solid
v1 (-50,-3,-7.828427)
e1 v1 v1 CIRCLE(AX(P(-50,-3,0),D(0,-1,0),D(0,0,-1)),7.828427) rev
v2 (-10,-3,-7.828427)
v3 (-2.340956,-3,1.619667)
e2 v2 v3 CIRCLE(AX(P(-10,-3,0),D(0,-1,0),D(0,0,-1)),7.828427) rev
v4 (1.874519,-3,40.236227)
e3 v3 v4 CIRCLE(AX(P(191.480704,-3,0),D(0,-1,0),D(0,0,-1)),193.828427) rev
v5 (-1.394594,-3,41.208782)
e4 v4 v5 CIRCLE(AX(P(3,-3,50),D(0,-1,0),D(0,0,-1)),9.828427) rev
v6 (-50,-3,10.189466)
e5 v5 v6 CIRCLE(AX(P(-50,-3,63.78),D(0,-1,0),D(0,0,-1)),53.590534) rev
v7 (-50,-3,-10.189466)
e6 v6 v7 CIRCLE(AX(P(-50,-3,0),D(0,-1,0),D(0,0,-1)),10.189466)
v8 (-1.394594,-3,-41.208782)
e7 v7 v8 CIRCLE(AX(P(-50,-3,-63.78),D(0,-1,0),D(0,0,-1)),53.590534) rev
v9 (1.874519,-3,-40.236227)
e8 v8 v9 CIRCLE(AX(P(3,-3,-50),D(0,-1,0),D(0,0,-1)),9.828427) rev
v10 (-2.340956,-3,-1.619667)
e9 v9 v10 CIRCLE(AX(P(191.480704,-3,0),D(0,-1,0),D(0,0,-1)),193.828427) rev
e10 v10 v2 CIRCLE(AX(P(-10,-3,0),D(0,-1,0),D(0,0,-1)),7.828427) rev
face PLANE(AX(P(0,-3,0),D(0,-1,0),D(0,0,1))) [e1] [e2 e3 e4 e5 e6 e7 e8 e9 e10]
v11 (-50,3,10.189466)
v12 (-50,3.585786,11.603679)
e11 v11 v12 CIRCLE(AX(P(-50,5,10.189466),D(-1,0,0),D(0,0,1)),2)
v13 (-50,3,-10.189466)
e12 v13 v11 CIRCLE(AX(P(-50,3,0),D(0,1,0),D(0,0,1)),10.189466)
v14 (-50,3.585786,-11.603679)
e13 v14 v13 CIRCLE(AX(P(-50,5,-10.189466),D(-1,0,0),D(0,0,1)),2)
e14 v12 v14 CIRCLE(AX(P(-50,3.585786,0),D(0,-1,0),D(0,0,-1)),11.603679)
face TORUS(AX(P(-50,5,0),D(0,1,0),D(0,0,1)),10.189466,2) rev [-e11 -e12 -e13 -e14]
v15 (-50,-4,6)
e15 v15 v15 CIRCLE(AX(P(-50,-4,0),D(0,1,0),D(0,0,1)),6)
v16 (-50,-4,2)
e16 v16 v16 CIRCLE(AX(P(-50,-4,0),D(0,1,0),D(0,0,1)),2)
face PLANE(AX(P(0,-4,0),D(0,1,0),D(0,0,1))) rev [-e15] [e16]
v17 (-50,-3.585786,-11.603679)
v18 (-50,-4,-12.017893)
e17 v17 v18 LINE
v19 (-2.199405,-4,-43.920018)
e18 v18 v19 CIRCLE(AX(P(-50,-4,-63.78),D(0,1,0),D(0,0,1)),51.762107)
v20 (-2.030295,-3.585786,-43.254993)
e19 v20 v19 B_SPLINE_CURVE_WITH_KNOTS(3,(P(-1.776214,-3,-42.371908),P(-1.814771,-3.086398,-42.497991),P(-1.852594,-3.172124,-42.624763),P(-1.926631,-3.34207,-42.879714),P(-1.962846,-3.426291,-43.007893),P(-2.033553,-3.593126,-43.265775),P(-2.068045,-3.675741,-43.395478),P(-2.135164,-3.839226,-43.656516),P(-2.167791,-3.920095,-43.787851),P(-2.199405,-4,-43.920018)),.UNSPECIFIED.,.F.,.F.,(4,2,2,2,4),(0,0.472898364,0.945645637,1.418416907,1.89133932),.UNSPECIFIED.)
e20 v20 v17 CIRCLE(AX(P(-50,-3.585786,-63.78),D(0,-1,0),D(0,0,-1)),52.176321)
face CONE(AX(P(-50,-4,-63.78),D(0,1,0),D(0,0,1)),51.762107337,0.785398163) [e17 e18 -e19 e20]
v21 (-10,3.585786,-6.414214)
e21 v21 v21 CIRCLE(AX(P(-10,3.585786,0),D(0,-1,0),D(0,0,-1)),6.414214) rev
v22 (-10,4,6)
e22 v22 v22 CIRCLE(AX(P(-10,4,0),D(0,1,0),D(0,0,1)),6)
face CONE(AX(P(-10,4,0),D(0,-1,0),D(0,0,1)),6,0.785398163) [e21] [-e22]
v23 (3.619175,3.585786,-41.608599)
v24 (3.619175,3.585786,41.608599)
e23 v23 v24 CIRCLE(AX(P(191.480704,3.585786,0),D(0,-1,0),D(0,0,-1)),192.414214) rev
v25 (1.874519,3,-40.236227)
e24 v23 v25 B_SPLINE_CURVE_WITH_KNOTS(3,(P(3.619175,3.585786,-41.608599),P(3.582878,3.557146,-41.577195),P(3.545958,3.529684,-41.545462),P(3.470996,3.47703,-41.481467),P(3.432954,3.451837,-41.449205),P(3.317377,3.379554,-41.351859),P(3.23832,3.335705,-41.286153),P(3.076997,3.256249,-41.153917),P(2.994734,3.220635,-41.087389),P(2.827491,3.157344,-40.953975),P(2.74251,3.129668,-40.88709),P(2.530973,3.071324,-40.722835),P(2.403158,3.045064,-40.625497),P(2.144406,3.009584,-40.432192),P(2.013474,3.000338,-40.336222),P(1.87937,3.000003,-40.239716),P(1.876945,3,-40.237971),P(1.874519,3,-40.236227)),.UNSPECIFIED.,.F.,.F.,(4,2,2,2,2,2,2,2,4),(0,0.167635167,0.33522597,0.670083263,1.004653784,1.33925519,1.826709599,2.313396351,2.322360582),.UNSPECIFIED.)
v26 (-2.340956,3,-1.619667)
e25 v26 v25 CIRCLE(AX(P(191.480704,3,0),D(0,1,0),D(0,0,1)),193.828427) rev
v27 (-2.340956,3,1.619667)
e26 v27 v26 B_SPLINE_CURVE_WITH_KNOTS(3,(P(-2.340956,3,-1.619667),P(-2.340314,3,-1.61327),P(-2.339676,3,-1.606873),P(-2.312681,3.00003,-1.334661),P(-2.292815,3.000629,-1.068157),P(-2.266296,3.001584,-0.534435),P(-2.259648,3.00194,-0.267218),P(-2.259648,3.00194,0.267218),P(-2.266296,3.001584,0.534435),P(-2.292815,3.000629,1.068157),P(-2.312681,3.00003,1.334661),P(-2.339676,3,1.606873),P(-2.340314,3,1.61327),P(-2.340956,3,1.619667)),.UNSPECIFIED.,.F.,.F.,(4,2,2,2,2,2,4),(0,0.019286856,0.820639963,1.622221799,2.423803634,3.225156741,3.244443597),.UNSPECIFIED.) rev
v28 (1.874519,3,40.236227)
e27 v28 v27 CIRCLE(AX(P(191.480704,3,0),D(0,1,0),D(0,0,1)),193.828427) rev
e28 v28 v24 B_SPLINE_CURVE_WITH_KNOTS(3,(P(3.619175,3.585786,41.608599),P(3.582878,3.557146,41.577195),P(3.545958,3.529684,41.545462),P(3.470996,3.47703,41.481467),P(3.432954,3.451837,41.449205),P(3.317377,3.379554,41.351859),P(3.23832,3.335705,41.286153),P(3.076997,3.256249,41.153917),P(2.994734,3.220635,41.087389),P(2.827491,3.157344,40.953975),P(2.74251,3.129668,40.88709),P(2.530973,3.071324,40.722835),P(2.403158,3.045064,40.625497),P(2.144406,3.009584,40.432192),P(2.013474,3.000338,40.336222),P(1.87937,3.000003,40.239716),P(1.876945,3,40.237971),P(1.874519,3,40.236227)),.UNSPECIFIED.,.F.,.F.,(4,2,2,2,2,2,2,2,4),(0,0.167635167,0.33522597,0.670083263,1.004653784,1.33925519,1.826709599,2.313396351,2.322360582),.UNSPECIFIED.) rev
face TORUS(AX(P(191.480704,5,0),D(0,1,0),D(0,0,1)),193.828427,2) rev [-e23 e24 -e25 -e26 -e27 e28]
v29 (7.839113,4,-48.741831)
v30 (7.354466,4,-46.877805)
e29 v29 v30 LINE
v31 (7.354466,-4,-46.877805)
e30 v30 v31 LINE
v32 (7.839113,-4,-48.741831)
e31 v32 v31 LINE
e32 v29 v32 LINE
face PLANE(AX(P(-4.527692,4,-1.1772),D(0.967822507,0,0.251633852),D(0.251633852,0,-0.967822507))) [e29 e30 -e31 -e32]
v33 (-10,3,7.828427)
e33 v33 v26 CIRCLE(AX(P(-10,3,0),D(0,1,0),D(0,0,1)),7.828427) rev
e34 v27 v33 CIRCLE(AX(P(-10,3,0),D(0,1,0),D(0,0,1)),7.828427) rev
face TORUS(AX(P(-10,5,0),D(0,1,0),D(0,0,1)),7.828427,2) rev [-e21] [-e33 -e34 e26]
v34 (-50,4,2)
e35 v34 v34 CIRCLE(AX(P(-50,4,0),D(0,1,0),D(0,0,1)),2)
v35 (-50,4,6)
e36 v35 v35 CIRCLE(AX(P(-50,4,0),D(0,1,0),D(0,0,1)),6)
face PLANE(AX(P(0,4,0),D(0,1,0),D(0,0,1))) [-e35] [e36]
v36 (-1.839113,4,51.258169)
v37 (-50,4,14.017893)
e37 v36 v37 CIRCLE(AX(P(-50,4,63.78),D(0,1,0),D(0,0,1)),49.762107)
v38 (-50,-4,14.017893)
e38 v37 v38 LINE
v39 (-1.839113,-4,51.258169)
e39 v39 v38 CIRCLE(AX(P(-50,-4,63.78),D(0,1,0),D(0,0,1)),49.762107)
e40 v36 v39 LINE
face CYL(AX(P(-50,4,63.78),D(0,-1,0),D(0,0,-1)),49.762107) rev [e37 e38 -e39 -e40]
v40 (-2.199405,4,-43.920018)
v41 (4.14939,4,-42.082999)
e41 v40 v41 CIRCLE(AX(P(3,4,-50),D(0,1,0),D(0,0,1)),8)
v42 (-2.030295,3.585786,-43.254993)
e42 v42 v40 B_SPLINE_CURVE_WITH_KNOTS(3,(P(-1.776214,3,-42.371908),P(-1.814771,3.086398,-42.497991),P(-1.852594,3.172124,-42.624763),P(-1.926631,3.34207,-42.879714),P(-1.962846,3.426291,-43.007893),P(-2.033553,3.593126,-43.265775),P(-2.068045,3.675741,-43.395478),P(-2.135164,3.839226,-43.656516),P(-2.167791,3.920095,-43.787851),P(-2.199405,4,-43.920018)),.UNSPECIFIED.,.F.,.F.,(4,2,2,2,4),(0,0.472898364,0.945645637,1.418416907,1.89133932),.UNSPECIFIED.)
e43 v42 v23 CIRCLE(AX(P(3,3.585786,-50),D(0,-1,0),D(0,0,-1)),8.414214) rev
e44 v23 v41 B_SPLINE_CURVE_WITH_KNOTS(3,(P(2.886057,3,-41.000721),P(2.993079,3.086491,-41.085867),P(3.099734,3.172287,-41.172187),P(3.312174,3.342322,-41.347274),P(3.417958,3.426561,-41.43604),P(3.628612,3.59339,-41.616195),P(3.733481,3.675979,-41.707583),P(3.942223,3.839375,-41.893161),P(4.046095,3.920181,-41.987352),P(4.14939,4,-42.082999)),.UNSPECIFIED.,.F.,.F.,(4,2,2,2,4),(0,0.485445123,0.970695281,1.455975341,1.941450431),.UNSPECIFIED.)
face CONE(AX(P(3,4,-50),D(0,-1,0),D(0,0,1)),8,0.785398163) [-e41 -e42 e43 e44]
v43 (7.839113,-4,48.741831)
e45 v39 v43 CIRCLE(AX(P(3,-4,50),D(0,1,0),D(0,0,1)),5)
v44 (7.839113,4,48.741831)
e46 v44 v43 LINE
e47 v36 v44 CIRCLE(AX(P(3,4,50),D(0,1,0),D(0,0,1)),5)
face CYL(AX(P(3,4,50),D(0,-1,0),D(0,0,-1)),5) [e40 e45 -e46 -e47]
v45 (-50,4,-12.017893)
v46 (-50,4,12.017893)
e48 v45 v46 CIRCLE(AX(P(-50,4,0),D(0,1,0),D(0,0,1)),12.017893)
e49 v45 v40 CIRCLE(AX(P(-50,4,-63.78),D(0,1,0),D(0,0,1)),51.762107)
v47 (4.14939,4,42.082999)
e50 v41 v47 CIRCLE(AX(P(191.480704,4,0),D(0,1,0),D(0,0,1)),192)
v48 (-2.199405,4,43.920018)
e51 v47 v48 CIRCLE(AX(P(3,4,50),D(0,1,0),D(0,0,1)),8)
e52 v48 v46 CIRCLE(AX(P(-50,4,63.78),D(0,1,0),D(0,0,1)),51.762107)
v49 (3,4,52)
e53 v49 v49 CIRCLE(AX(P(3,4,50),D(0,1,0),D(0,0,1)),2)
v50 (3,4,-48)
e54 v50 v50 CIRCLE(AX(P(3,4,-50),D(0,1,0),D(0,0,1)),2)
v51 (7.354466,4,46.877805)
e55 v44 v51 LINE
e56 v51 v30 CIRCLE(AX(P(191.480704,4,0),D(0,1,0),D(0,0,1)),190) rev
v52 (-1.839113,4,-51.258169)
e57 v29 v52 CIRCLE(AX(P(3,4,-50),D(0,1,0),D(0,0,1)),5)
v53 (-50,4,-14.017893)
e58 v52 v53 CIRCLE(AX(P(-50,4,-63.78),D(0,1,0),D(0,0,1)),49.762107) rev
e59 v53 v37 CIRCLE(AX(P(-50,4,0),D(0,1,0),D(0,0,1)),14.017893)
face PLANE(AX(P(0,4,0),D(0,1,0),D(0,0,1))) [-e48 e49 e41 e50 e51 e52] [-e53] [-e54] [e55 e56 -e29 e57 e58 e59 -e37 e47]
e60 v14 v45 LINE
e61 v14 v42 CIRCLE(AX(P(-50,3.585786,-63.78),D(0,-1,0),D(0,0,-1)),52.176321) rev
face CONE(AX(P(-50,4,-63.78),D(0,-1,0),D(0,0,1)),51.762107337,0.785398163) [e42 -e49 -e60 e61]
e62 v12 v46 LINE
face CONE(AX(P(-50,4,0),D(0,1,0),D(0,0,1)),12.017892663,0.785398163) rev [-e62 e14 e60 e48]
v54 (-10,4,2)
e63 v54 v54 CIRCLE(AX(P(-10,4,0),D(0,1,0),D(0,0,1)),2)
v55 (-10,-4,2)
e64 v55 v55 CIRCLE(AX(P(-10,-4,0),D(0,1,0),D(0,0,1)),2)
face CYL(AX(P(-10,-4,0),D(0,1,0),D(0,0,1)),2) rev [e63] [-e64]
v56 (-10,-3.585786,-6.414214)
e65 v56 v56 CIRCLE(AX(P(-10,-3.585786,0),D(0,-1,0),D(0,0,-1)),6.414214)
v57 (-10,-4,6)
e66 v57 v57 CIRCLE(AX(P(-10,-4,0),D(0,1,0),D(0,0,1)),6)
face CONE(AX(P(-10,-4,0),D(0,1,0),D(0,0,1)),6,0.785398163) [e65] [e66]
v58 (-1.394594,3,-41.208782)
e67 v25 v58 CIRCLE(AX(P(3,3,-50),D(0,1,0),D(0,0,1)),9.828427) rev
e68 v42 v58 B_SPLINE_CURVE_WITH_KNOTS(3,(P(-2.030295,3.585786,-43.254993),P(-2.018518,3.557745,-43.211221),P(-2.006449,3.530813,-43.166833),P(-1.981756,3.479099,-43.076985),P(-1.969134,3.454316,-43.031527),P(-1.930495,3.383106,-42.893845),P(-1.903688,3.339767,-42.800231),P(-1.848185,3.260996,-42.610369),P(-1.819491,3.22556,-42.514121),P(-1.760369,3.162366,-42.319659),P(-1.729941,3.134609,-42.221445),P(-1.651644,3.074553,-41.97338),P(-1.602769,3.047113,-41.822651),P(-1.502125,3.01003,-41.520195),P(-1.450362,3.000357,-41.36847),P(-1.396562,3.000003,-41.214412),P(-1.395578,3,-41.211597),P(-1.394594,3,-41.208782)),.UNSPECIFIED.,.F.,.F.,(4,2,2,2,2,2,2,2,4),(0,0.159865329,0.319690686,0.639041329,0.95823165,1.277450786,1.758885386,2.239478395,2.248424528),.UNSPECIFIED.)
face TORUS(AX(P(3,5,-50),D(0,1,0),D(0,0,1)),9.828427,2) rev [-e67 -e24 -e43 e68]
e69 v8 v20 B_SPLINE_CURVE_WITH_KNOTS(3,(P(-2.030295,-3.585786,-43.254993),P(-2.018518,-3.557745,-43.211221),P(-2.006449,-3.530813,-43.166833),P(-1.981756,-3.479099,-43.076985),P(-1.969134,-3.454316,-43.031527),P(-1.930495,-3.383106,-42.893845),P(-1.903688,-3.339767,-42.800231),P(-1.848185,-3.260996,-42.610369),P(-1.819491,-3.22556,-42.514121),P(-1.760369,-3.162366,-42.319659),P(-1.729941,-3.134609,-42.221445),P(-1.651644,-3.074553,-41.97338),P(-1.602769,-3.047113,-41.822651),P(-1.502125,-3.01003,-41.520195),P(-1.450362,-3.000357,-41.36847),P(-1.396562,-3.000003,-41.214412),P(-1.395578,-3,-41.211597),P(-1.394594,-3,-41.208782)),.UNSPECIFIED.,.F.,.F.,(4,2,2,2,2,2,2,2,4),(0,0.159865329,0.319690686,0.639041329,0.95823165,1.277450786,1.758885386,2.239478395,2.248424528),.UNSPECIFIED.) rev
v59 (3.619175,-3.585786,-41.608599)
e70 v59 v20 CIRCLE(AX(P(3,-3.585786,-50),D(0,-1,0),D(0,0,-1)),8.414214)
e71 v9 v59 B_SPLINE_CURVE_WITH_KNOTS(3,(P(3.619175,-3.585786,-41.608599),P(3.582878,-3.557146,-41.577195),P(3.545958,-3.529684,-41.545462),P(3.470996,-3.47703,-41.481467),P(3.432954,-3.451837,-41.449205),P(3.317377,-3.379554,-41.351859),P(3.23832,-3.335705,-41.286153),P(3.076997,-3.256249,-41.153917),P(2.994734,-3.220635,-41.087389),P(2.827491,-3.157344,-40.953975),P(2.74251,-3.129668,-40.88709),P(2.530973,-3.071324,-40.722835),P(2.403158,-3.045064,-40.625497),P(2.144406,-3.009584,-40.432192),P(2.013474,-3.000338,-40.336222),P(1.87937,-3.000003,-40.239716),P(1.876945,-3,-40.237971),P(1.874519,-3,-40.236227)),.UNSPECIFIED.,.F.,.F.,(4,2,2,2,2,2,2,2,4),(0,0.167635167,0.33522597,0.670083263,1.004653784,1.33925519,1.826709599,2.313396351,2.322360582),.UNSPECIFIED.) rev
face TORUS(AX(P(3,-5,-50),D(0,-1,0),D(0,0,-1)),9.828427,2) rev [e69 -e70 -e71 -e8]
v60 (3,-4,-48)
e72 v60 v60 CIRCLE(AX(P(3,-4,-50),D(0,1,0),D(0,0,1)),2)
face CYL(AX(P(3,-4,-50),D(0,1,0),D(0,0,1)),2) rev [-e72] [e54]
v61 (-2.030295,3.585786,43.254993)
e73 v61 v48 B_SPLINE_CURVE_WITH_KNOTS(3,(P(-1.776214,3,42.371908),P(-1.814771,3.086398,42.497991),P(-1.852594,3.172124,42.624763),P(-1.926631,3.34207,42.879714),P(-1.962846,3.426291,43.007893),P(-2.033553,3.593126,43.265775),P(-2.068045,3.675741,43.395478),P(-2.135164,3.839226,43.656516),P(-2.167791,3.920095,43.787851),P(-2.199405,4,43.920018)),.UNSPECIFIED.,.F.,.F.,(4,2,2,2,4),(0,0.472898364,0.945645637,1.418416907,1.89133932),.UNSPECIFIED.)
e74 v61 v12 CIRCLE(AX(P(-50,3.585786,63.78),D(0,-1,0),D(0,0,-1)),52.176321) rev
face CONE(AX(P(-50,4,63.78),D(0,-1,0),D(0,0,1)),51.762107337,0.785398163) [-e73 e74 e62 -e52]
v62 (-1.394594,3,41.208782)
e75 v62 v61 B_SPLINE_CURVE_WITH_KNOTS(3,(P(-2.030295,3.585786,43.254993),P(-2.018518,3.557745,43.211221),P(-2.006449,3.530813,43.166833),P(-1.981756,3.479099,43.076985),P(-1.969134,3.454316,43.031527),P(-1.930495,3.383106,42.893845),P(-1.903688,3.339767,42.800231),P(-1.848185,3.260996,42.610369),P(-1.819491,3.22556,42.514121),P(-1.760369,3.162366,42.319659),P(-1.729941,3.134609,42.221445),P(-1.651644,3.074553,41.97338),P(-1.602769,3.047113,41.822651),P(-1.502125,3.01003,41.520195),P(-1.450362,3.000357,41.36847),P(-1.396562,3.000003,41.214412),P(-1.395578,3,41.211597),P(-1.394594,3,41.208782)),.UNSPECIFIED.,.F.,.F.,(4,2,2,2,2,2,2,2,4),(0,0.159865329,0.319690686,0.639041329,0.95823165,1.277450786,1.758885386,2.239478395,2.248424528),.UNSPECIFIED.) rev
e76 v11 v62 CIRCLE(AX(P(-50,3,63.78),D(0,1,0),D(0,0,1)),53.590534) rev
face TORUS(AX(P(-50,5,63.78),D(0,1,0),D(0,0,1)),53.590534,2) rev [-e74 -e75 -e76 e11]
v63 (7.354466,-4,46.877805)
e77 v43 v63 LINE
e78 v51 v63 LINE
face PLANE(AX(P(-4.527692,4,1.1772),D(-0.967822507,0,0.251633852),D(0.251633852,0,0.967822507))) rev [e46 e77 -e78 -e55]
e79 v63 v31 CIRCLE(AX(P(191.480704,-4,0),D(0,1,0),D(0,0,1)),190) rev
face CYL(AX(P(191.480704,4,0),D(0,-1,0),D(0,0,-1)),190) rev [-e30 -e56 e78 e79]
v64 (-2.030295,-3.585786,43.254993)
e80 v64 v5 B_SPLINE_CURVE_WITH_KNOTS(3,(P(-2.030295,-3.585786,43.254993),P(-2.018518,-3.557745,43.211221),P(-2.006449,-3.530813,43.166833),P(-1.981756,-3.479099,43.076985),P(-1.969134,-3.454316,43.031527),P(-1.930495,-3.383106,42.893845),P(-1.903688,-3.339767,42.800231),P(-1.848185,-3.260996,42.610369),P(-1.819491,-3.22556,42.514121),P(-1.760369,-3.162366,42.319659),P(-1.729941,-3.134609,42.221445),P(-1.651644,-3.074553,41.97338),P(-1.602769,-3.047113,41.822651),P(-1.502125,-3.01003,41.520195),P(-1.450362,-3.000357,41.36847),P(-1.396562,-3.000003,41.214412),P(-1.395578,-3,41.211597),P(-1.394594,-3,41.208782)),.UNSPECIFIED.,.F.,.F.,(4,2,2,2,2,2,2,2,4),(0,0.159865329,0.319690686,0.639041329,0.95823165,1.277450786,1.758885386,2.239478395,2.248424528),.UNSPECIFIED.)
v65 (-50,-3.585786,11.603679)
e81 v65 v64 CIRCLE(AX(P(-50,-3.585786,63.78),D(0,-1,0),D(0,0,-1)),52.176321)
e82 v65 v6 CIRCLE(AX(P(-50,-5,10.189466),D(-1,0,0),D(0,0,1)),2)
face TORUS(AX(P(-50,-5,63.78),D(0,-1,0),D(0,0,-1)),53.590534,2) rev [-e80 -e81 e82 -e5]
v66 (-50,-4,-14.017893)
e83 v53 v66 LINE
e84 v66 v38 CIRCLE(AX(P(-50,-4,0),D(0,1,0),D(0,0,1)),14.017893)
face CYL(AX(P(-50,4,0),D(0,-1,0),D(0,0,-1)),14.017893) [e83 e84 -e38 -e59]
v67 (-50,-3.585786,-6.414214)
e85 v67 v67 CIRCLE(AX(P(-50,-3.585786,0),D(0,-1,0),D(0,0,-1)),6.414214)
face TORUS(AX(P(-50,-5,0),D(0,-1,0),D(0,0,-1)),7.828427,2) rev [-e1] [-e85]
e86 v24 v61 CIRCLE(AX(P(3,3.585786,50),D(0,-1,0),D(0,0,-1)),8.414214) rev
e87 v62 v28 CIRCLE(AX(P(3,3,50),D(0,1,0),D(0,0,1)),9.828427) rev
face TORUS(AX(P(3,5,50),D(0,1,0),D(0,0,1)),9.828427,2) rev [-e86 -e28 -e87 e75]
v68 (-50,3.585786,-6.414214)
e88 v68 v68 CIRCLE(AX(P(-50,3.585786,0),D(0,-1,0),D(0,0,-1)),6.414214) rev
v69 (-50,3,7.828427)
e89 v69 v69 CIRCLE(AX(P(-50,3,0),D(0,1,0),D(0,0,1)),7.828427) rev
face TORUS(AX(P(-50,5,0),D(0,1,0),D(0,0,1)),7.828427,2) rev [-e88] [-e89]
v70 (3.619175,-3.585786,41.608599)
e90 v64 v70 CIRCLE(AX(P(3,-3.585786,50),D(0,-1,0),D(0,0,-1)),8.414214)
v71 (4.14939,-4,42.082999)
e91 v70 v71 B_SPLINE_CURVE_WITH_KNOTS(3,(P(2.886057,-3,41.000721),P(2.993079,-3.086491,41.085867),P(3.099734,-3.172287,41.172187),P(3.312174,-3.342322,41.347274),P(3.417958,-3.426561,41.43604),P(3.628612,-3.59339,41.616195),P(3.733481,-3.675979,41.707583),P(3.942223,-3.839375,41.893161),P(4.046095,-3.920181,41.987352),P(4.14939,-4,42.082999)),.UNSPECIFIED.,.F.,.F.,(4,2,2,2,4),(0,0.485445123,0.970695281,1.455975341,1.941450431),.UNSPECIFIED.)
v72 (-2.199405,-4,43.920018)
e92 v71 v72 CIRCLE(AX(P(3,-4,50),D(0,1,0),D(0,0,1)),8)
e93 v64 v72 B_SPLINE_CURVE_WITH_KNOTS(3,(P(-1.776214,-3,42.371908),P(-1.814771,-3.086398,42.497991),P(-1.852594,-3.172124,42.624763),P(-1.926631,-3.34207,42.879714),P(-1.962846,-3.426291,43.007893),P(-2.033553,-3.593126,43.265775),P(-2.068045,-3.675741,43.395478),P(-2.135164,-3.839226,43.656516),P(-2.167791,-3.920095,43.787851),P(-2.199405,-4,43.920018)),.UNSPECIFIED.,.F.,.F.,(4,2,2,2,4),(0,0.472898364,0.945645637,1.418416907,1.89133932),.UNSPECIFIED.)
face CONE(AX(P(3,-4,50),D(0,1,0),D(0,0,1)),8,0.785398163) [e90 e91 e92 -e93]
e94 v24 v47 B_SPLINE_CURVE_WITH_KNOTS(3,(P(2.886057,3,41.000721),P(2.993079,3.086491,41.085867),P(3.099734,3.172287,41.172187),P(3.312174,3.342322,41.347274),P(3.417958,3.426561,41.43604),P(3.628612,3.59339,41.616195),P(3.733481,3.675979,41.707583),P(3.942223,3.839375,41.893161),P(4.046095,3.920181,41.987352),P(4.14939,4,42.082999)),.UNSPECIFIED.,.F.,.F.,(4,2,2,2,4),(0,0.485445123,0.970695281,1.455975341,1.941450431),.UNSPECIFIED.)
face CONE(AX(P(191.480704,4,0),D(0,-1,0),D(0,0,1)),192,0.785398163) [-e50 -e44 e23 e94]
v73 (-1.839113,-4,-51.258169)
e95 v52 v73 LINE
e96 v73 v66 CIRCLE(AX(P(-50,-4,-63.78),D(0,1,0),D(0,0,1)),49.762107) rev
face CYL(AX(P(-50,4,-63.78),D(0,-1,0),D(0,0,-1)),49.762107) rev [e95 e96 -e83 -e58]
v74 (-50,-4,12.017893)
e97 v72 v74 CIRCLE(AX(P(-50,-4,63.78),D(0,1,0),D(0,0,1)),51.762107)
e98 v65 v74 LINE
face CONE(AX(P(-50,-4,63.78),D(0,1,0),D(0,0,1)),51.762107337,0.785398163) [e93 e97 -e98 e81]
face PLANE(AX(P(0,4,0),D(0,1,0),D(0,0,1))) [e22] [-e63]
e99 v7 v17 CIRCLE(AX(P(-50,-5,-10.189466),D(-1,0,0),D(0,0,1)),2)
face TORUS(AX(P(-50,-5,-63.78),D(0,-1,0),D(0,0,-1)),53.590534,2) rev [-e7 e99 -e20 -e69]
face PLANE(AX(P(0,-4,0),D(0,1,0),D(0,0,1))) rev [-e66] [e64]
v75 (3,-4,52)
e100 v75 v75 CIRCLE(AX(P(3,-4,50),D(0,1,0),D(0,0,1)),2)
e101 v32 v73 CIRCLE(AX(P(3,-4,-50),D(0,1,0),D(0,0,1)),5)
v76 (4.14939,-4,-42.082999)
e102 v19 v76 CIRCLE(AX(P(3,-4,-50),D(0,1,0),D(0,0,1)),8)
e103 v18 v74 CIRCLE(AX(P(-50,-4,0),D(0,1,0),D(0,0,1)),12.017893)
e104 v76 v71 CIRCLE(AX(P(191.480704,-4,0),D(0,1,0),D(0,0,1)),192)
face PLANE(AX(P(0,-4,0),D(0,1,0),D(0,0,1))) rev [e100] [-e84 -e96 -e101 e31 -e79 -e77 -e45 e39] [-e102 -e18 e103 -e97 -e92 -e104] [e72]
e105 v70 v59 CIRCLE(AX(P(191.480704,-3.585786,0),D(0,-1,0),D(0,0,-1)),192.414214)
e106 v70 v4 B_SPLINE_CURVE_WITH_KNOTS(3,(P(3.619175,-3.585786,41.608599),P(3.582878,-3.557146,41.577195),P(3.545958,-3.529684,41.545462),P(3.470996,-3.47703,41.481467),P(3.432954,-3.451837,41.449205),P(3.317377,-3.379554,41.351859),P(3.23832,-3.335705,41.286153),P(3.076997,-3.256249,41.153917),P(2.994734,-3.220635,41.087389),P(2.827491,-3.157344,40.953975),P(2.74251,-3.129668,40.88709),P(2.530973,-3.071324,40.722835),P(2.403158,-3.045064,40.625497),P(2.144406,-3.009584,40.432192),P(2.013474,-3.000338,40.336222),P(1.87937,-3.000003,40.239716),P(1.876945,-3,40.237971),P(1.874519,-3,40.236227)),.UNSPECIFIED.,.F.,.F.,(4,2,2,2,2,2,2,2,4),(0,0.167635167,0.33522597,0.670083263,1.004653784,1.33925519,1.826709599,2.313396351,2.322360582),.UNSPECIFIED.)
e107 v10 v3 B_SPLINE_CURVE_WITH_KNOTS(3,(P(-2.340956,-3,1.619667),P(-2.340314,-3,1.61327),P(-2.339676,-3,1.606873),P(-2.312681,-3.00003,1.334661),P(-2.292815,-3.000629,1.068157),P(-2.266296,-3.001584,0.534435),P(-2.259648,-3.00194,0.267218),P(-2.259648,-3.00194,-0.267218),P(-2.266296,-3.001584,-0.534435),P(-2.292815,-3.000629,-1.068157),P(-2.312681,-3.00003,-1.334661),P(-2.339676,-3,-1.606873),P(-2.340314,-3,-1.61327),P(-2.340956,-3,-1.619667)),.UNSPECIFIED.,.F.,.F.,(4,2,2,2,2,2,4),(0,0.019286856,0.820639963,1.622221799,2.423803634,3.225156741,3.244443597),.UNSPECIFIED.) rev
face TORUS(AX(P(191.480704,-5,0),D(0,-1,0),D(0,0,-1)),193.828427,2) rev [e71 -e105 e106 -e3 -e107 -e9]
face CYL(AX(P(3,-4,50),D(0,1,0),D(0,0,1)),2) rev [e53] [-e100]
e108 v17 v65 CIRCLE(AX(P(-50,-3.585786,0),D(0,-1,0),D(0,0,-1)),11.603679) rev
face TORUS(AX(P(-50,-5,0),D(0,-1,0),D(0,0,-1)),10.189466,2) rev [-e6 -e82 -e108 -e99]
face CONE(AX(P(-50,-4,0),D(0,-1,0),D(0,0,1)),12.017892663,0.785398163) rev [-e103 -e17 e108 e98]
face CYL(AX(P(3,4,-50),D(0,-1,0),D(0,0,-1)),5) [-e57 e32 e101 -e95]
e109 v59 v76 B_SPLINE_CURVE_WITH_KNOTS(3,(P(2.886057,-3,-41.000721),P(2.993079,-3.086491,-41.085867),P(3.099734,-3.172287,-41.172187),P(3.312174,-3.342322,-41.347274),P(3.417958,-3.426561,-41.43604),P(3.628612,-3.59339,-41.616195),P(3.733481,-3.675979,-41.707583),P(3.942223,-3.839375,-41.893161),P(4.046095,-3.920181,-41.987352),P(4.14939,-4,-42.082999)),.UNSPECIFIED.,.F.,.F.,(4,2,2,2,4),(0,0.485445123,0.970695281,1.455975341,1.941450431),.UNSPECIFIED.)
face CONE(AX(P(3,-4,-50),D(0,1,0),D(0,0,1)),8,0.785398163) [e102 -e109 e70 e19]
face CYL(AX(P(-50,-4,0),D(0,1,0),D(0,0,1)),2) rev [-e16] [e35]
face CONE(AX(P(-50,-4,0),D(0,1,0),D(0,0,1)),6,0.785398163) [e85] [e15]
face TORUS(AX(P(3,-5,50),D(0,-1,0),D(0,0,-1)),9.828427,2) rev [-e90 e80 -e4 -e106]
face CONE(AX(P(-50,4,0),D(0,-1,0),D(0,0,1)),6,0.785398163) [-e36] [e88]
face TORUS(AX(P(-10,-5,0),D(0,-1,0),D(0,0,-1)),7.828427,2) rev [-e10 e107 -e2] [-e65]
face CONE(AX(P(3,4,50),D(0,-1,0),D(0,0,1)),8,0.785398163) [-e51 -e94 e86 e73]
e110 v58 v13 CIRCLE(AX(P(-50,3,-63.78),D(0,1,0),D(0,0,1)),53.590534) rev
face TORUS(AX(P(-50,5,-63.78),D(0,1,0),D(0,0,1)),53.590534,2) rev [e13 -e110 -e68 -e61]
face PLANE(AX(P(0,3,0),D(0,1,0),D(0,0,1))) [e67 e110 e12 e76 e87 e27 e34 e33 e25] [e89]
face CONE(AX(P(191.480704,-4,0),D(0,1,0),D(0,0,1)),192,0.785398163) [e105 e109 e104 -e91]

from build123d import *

# Parameters (mm, degrees)
BOSS_EXTRUDE1_DEPTH     = 4
SKETCH2_R               = 2
CUT_EXTRUDE1_DEPTH      = 58.567351858
SKETCH4_R               = 2
CUT_EXTRUDE2_DEPTH      = 58.567351858
BOSS_EXTRUDE2_DEPTH     = 4
SKETCH7_R               = 2
CUT_EXTRUDE3_DEPTH      = 85.777889694
BOSS_EXTRUDE3_DEPTH     = 4
SKETCH9_R               = 6
CUT_EXTRUDE4_DEPTH      = 1
CUT_EXTRUDE4_DRAFT      = -45
FILLET5_R               = 2
MIRROR2_COPY_1_SKETCH_R = 6
MIRROR2_COPY_1_DEPTH    = 1
MIRROR2_COPY_1_DRAFT    = -45
FILLET5_OF_MIRROR2_R    = 2


with BuildPart() as part:
    # Sketch1 → Boss-Extrude1 (new, symmetric)
    with BuildSketch(Plane(origin=(0, 0, 0), x_dir=(1, 0, 0), z_dir=(0, 1, 0))):
        with BuildLine():
            Line((-14.839112534, -1.258169259), (-1.839112534, -51.258169259))
            ThreePointArc((-1.839112534, -51.258169259), (4.258169259, -54.839112534), (7.839112534, -48.741830741))
            Line((7.839112534, -48.741830741), (-4.833763459, 0))
            Line((-4.833763459, 0), (-5.160887466, -1.258169259))
            ThreePointArc((-5.160887466, -1.258169259), (-10, -5), (-14.839112534, -1.258169259))
        make_face()
        with BuildLine():
            ThreePointArc((-14.839112534, 1.258169259), (-15, 0), (-14.839112534, -1.258169259))
            ThreePointArc((-14.839112534, -1.258169259), (-10, -5), (-5.160887466, -1.258169259))
            Line((-5.160887466, -1.258169259), (-4.833763459, 0))
            Line((-4.833763459, 0), (-5.160887466, 1.258169259))
            ThreePointArc((-5.160887466, 1.258169259), (-10, 5), (-14.839112534, 1.258169259))
        make_face()
        with BuildLine():
            Line((-1.839112534, 51.258169259), (-14.839112534, 1.258169259))
            ThreePointArc((-14.839112534, 1.258169259), (-10, 5), (-5.160887466, 1.258169259))
            Line((-5.160887466, 1.258169259), (-4.833763459, 0))
            Line((-4.833763459, 0), (7.839112534, 48.741830741))
            ThreePointArc((7.839112534, 48.741830741), (4.258169259, 54.839112534), (-1.839112534, 51.258169259))
        make_face()
    extrude(amount=BOSS_EXTRUDE1_DEPTH, both=True)

    # Sketch2 → Cut-Extrude1 (cut, through all)
    with BuildSketch(Plane(origin=(0, 4, 0), x_dir=(1, 0, 0), z_dir=(0, 1, 0))):
        with Locations(Location((-10, 0, 0), (0, 0, 270))):
            Circle(SKETCH2_R)
    extrude(amount=-CUT_EXTRUDE1_DEPTH, mode=Mode.SUBTRACT)

    # Sketch4 → Cut-Extrude2 (cut, through all)
    with BuildSketch(Plane(origin=(0, 4, 0), x_dir=(1, 0, 0), z_dir=(0, 1, 0))):
        with Locations(Location((3, -50, 0), (0, 0, 270))):
            Circle(SKETCH4_R)
        with Locations(Location((3, 50, 0), (0, 0, 270))):
            Circle(SKETCH4_R)
    extrude(amount=-CUT_EXTRUDE2_DEPTH, mode=Mode.SUBTRACT)

    # Sketch6 → Boss-Extrude2 (add, symmetric)
    with BuildSketch(Plane(origin=(0, 0, 0), x_dir=(1, 0, 0), z_dir=(0, 1, 0))):
        with BuildLine():
            Line((-1.839112534, -51.258169259), (-14.839112534, -1.258169259))
            ThreePointArc((-14.839112534, -1.258169259), (-15, 0), (-14.839112534, 1.258169259))
            Line((-14.839112534, 1.258169259), (-1.839112534, 51.258169259))
            ThreePointArc((-1.839112534, 51.258169259), (-19.560267402, 24.413897754), (-50, 14.017892663))
            ThreePointArc((-50, 14.017892663), (-64.017892663, 0), (-50, -14.017892663))
            ThreePointArc((-50, -14.017892663), (-19.560267402, -24.413897754), (-1.839112534, -51.258169259))
        make_face()
    extrude(amount=BOSS_EXTRUDE2_DEPTH, both=True)

    # Sketch7 → Cut-Extrude3 (cut, through all)
    with BuildSketch(Plane(origin=(0, 4, 0), x_dir=(1, 0, 0), z_dir=(0, 1, 0))):
        with Locations(Location((-50, 0, 0), (0, 0, 270))):
            Circle(SKETCH7_R)
    extrude(amount=-CUT_EXTRUDE3_DEPTH, mode=Mode.SUBTRACT)

    # Sketch8 → Boss-Extrude3 (add, symmetric)
    with BuildSketch(Plane(origin=(0, 0, 0), x_dir=(1, 0, 0), z_dir=(0, 1, 0))):
        with BuildLine():
            ThreePointArc((7.35446577, -46.877804725), (1.480703509, 0), (7.35446577, 46.877804725))
            Line((7.35446577, 46.877804725), (-4.833763459, 0))
            Line((-4.833763459, 0), (7.35446577, -46.877804725))
        make_face()
    extrude(amount=BOSS_EXTRUDE3_DEPTH, both=True)


with BuildPart() as cut_extrude4_tool:
    # Sketch9 → Cut-Extrude4 (with draft: the straight prism first)
    with BuildSketch(Plane(origin=(0, 4, 0), x_dir=(1, 0, 0), z_dir=(0, 1, 0))):
        with BuildLine():
            ThreePointArc((-2.199405253, -43.920017679), (0.776418175, -42.315230396), (4.149389552, -42.082999074))
            ThreePointArc((4.149389552, -42.082999074), (-0.519296491, 0), (4.149389552, 42.082999074))
            ThreePointArc((4.149389552, 42.082999074), (0.776418175, 42.315230396), (-2.199405253, 43.920017679))
            ThreePointArc((-2.199405253, 43.920017679), (-21.26568933, 20.725904419), (-50, 12.017892663))
            ThreePointArc((-50, 12.017892663), (-62.017892663, 0), (-50, -12.017892663))
            ThreePointArc((-50, -12.017892663), (-21.26568933, -20.725904419), (-2.199405253, -43.920017679))
        make_face()
        with Locations((-10, 0)):
            Circle(SKETCH9_R, mode=Mode.SUBTRACT)
        with Locations((-50, 0)):
            Circle(SKETCH9_R, mode=Mode.SUBTRACT)
    extrude(amount=-CUT_EXTRUDE4_DEPTH)
    # Cut-Extrude4: the draft: its side faces are tilted about the plane it starts from
    cut_extrude4_sides = [cut_extrude4_tool.faces().sort_by_distance(p)[0] for p in [
        (0.776418175, 3.5, 42.315230396),
        (-0.519296491, 3.5, 0),
        (0.776418175, 3.5, -42.315230396),
        (-21.26568933, 3.5, -20.725904419),
        (-62.017892663, 3.5, 0),
        (-21.26568933, 3.5, 20.725904419),
        (-16, 3.5, 0),
        (-56, 3.5, 0),
    ]]
    draft(cut_extrude4_sides, Plane(origin=(0, 4, 0), x_dir=(1, 0, 0), z_dir=(0, 1, 0)), CUT_EXTRUDE4_DRAFT)


with BuildPart() as part_1:
    add(part.part)

    # Cut-Extrude4: cut by cut_extrude4_tool
    add(cut_extrude4_tool.part, mode=Mode.SUBTRACT)

    # Fillet5
    # the kernel refuses this fillet: 2 mm, written as the material it adds along each edge
    with BuildSketch(Plane(origin=(-50, 3, 0), x_dir=(1, 0, 0), z_dir=(0, 0, 1))) as fillet5_piece_1:
        with BuildLine():
            CenterArc((7 + FILLET5_R * 0.414213562373, FILLET5_R), FILLET5_R, 225, 45)
            Line((7 - FILLET5_R * 0.292893218813, FILLET5_R * 0.292893218813), (7, 0))
            Line((7, 0), (7 + FILLET5_R * 0.414213562373, 0))
        make_face()
    fillet5_piece_1_solid = revolve(axis=Axis((-50, 3, 0), (0, 1, 0)), mode=Mode.PRIVATE)
    with BuildSketch(Plane(origin=(-10, 3, 0), x_dir=(1, 0, 0), z_dir=(0, 0, 1))) as fillet5_piece_2:
        with BuildLine():
            CenterArc((7 + FILLET5_R * 0.414213562373, FILLET5_R), FILLET5_R, 225, 45)
            Line((7 - FILLET5_R * 0.292893218813, FILLET5_R * 0.292893218813), (7, 0))
            Line((7, 0), (7 + FILLET5_R * 0.414213562373, 0))
        make_face()
    fillet5_piece_2_solid = revolve(axis=Axis((-10, 3, 0), (0, 1, 0)), mode=Mode.PRIVATE)
    with BuildSketch(Plane(origin=(-50, 3, 0), x_dir=(0, 0, -1), z_dir=(1, 0, 0))) as fillet5_piece_3:
        with BuildLine():
            CenterArc((11.017892663 - FILLET5_R * 0.414213562373, FILLET5_R), FILLET5_R, 270, 45)
            Line((11.017892663 - FILLET5_R * 0.414213562373, 0), (11.017892663, 0))
            Line((11.017892663, 0), (11.017892663 + FILLET5_R * 0.292893218813, FILLET5_R * 0.292893218813))
        make_face()
    fillet5_piece_3_solid = revolve(axis=Axis((-50, 3, 0), (0, 1, 0)), revolution_arc=180, mode=Mode.PRIVATE)
    with BuildSketch(Plane(origin=(-50, 3, -63.78), x_dir=(0.9292070128080167, 0, 0.369559639771989), z_dir=(0.369559639771989, 0, -0.9292070128080167))) as fillet5_piece_4:
        with BuildLine():
            CenterArc((52.762107337 + FILLET5_R * 0.414213562373, -FILLET5_R), FILLET5_R, 90, 45)
            Line((52.762107337 + FILLET5_R * 0.414213562373, 0), (52.762107337, 0))
            Line((52.762107337, 0), (52.762107337 - FILLET5_R * 0.292893218813, -FILLET5_R * 0.292893218813))
        make_face()
    fillet5_piece_4_solid = revolve(axis=Axis((-50, 3, -63.78), (0, -1, 0)), revolution_arc=68.311538304, mode=Mode.PRIVATE)
    with BuildSketch(Plane(origin=(3, 3, -50), x_dir=(0.21575905141921134, 0, 0.9764466353727079), z_dir=(0.9764466353727079, 0, -0.21575905141921134))) as fillet5_piece_5:
        with BuildLine():
            CenterArc((9 + FILLET5_R * 0.414213562373, -FILLET5_R), FILLET5_R, 90, 45)
            Line((9 + FILLET5_R * 0.414213562373, 0), (9, 0))
            Line((9, 0), (9 - FILLET5_R * 0.292893218813, -FILLET5_R * 0.292893218813))
        make_face()
    fillet5_piece_5_solid = revolve(axis=Axis((3, 3, -50), (0, -1, 0)), revolution_arc=57.697645728, mode=Mode.PRIVATE)
    with BuildSketch(Plane(origin=(191.480703509, 3, 0), x_dir=(-0.9748383813720877, 0, 0.2229128309538239), z_dir=(0.2229128309538239, 0, 0.9748383813720877))) as fillet5_piece_6:
        with BuildLine():
            CenterArc((193 + FILLET5_R * 0.414213562373, -FILLET5_R), FILLET5_R, 90, 45)
            Line((193 + FILLET5_R * 0.414213562373, 0), (193, 0))
            Line((193, 0), (193 - FILLET5_R * 0.292893218813, -FILLET5_R * 0.292893218813))
        make_face()
    fillet5_piece_6_solid = revolve(axis=Axis((191.480703509, 3, 0), (0, -1, 0)), revolution_arc=25.760350812, mode=Mode.PRIVATE)
    with BuildSketch(Plane(origin=(3, 3, 50), x_dir=(-0.7100327834858502, 0, -0.7041686206977245), z_dir=(-0.7041686206977245, 0, 0.7100327834858502))) as fillet5_piece_7:
        with BuildLine():
            CenterArc((9 + FILLET5_R * 0.414213562373, -FILLET5_R), FILLET5_R, 90, 45)
            Line((9 + FILLET5_R * 0.414213562373, 0), (9, 0))
            Line((9, 0), (9 - FILLET5_R * 0.292893218813, -FILLET5_R * 0.292893218813))
        make_face()
    fillet5_piece_7_solid = revolve(axis=Axis((3, 3, 50), (0, -1, 0)), revolution_arc=57.697645728, mode=Mode.PRIVATE)
    with BuildSketch(Plane(origin=(-50, 3, 63.78), x_dir=(0, 0, -1), z_dir=(-1, 0, 0))) as fillet5_piece_8:
        with BuildLine():
            CenterArc((52.762107337 + FILLET5_R * 0.414213562373, -FILLET5_R), FILLET5_R, 90, 45)
            Line((52.762107337 + FILLET5_R * 0.414213562373, 0), (52.762107337, 0))
            Line((52.762107337, 0), (52.762107337 - FILLET5_R * 0.292893218813, -FILLET5_R * 0.292893218813))
        make_face()
    fillet5_piece_8_solid = revolve(axis=Axis((-50, 3, 63.78), (0, -1, 0)), revolution_arc=68.311538304, mode=Mode.PRIVATE)
    add([fillet5_piece_1_solid, fillet5_piece_2_solid, fillet5_piece_3_solid, fillet5_piece_4_solid, fillet5_piece_5_solid, fillet5_piece_6_solid, fillet5_piece_7_solid, fillet5_piece_8_solid])


with BuildPart() as mirror2_copy_1_tool:
    # Mirror2 copy 1 sketch → Mirror2 copy 1 (with draft: the straight prism first)
    with BuildSketch(Plane.XZ.offset(4)):
        with BuildLine():
            ThreePointArc((-2.199405253, 43.920017679), (0.776418175, 42.315230396), (4.149389552, 42.082999074))
            ThreePointArc((4.149389552, 42.082999074), (-0.519296491, 0), (4.149389552, -42.082999074))
            ThreePointArc((4.149389552, -42.082999074), (0.776418175, -42.315230396), (-2.199405253, -43.920017679))
            ThreePointArc((-2.199405253, -43.920017679), (-21.26568933, -20.725904419), (-50, -12.017892663))
            ThreePointArc((-50, -12.017892663), (-62.017892663, 0), (-50, 12.017892663))
            ThreePointArc((-50, 12.017892663), (-21.26568933, 20.725904419), (-2.199405253, 43.920017679))
        make_face()
        with Locations((-10, 0)):
            Circle(MIRROR2_COPY_1_SKETCH_R, mode=Mode.SUBTRACT)
        with Locations((-50, 0)):
            Circle(MIRROR2_COPY_1_SKETCH_R, mode=Mode.SUBTRACT)
    extrude(amount=-MIRROR2_COPY_1_DEPTH)
    # Mirror2 copy 1: the draft: its side faces are tilted about the plane it starts from
    mirror2_copy_1_sides = [mirror2_copy_1_tool.faces().sort_by_distance(p)[0] for p in [
        (0.776418175, -3.5, 42.315230396),
        (-0.519296491, -3.5, 0),
        (0.776418175, -3.5, -42.315230396),
        (-21.26568933, -3.5, -20.725904419),
        (-62.017892663, -3.5, 0),
        (-21.26568933, -3.5, 20.725904419),
        (-16, -3.5, 0),
        (-56, -3.5, 0),
    ]]
    draft(mirror2_copy_1_sides, Plane.XZ.offset(4), MIRROR2_COPY_1_DRAFT)


with BuildPart() as part_2:
    add(part_1.part)

    # Mirror2 copy 1: cut by mirror2_copy_1_tool
    add(mirror2_copy_1_tool.part, mode=Mode.SUBTRACT)

    # Fillet5 of Mirror2
    # the kernel refuses this fillet: 2 mm, written as the material it adds along each edge
    with BuildSketch(Plane(origin=(-50, -3, 0), x_dir=(1, 0, 0), z_dir=(0, 0, -1))) as fillet5_of_mirror2_piece_1:
        with BuildLine():
            CenterArc((7 + FILLET5_OF_MIRROR2_R * 0.414213562373, FILLET5_OF_MIRROR2_R), FILLET5_OF_MIRROR2_R, 225, 45)
            Line((7 + FILLET5_OF_MIRROR2_R * 0.414213562373, 0), (7, 0))
            Line((7, 0), (7 - FILLET5_OF_MIRROR2_R * 0.292893218813, FILLET5_OF_MIRROR2_R * 0.292893218813))
        make_face()
    fillet5_of_mirror2_piece_1_solid = revolve(axis=Axis((-50, -3, 0), (0, -1, 0)), mode=Mode.PRIVATE)
    with BuildSketch(Plane(origin=(-10, -3, 0), x_dir=(1, 0, 0), z_dir=(0, 0, -1))) as fillet5_of_mirror2_piece_2:
        with BuildLine():
            CenterArc((7 + FILLET5_OF_MIRROR2_R * 0.414213562373, FILLET5_OF_MIRROR2_R), FILLET5_OF_MIRROR2_R, 225, 45)
            Line((7 - FILLET5_OF_MIRROR2_R * 0.292893218813, FILLET5_OF_MIRROR2_R * 0.292893218813), (7, 0))
            Line((7, 0), (7 + FILLET5_OF_MIRROR2_R * 0.414213562373, 0))
        make_face()
    fillet5_of_mirror2_piece_2_solid = revolve(axis=Axis((-10, -3, 0), (0, -1, 0)), mode=Mode.PRIVATE)
    with BuildSketch(Plane(origin=(-50, -3, 0), x_dir=(0, 0, -1), z_dir=(1, 0, 0))) as fillet5_of_mirror2_piece_3:
        with BuildLine():
            CenterArc((11.017892663 - FILLET5_OF_MIRROR2_R * 0.414213562373, -FILLET5_OF_MIRROR2_R), FILLET5_OF_MIRROR2_R, 45, 45)
            Line((11.017892663 + FILLET5_OF_MIRROR2_R * 0.292893218813, -FILLET5_OF_MIRROR2_R * 0.292893218813), (11.017892663, 0))
            Line((11.017892663, 0), (11.017892663 - FILLET5_OF_MIRROR2_R * 0.414213562373, 0))
        make_face()
    fillet5_of_mirror2_piece_3_solid = revolve(axis=Axis((-50, -3, 0), (0, 1, 0)), revolution_arc=180, mode=Mode.PRIVATE)
    with BuildSketch(Plane(origin=(-50, -3, -63.78), x_dir=(0.9292070128080167, 0, 0.369559639771989), z_dir=(0.369559639771989, 0, -0.9292070128080167))) as fillet5_of_mirror2_piece_4:
        with BuildLine():
            CenterArc((52.762107337 + FILLET5_OF_MIRROR2_R * 0.414213562373, FILLET5_OF_MIRROR2_R), FILLET5_OF_MIRROR2_R, 225, 45)
            Line((52.762107337 - FILLET5_OF_MIRROR2_R * 0.292893218813, FILLET5_OF_MIRROR2_R * 0.292893218813), (52.762107337, 0))
            Line((52.762107337, 0), (52.762107337 + FILLET5_OF_MIRROR2_R * 0.414213562373, 0))
        make_face()
    fillet5_of_mirror2_piece_4_solid = revolve(axis=Axis((-50, -3, -63.78), (0, -1, 0)), revolution_arc=68.311538304, mode=Mode.PRIVATE)
    with BuildSketch(Plane(origin=(3, -3, -50), x_dir=(0.21575905141921103, 0, 0.9764466353727079), z_dir=(0.9764466353727079, 0, -0.21575905141921103))) as fillet5_of_mirror2_piece_5:
        with BuildLine():
            CenterArc((9 + FILLET5_OF_MIRROR2_R * 0.414213562373, FILLET5_OF_MIRROR2_R), FILLET5_OF_MIRROR2_R, 225, 45)
            Line((9 - FILLET5_OF_MIRROR2_R * 0.292893218813, FILLET5_OF_MIRROR2_R * 0.292893218813), (9, 0))
            Line((9, 0), (9 + FILLET5_OF_MIRROR2_R * 0.414213562373, 0))
        make_face()
    fillet5_of_mirror2_piece_5_solid = revolve(axis=Axis((3, -3, -50), (0, -1, 0)), revolution_arc=57.697645728, mode=Mode.PRIVATE)
    with BuildSketch(Plane(origin=(191.480703509, -3, 0), x_dir=(-0.9748383813720877, 0, 0.2229128309538239), z_dir=(0.2229128309538239, 0, 0.9748383813720877))) as fillet5_of_mirror2_piece_6:
        with BuildLine():
            CenterArc((193 + FILLET5_OF_MIRROR2_R * 0.414213562373, FILLET5_OF_MIRROR2_R), FILLET5_OF_MIRROR2_R, 225, 45)
            Line((193 - FILLET5_OF_MIRROR2_R * 0.292893218813, FILLET5_OF_MIRROR2_R * 0.292893218813), (193, 0))
            Line((193, 0), (193 + FILLET5_OF_MIRROR2_R * 0.414213562373, 0))
        make_face()
    fillet5_of_mirror2_piece_6_solid = revolve(axis=Axis((191.480703509, -3, 0), (0, -1, 0)), revolution_arc=25.760350812, mode=Mode.PRIVATE)
    with BuildSketch(Plane(origin=(3, -3, 50), x_dir=(-0.7100327834858502, 0, -0.7041686206977245), z_dir=(-0.7041686206977245, 0, 0.7100327834858502))) as fillet5_of_mirror2_piece_7:
        with BuildLine():
            CenterArc((9 + FILLET5_OF_MIRROR2_R * 0.414213562373, FILLET5_OF_MIRROR2_R), FILLET5_OF_MIRROR2_R, 225, 45)
            Line((9 - FILLET5_OF_MIRROR2_R * 0.292893218813, FILLET5_OF_MIRROR2_R * 0.292893218813), (9, 0))
            Line((9, 0), (9 + FILLET5_OF_MIRROR2_R * 0.414213562373, 0))
        make_face()
    fillet5_of_mirror2_piece_7_solid = revolve(axis=Axis((3, -3, 50), (0, -1, 0)), revolution_arc=57.697645728, mode=Mode.PRIVATE)
    with BuildSketch(Plane(origin=(-50, -3, 63.78), x_dir=(0, 0, -1), z_dir=(-1, 0, 0))) as fillet5_of_mirror2_piece_8:
        with BuildLine():
            CenterArc((52.762107337 + FILLET5_OF_MIRROR2_R * 0.414213562373, FILLET5_OF_MIRROR2_R), FILLET5_OF_MIRROR2_R, 225, 45)
            Line((52.762107337 - FILLET5_OF_MIRROR2_R * 0.292893218813, FILLET5_OF_MIRROR2_R * 0.292893218813), (52.762107337, 0))
            Line((52.762107337, 0), (52.762107337 + FILLET5_OF_MIRROR2_R * 0.414213562373, 0))
        make_face()
    fillet5_of_mirror2_piece_8_solid = revolve(axis=Axis((-50, -3, 63.78), (0, -1, 0)), revolution_arc=68.311538304, mode=Mode.PRIVATE)
    add([fillet5_of_mirror2_piece_1_solid, fillet5_of_mirror2_piece_2_solid, fillet5_of_mirror2_piece_3_solid, fillet5_of_mirror2_piece_4_solid, fillet5_of_mirror2_piece_5_solid, fillet5_of_mirror2_piece_6_solid, fillet5_of_mirror2_piece_7_solid, fillet5_of_mirror2_piece_8_solid])


solid = part_2.part
